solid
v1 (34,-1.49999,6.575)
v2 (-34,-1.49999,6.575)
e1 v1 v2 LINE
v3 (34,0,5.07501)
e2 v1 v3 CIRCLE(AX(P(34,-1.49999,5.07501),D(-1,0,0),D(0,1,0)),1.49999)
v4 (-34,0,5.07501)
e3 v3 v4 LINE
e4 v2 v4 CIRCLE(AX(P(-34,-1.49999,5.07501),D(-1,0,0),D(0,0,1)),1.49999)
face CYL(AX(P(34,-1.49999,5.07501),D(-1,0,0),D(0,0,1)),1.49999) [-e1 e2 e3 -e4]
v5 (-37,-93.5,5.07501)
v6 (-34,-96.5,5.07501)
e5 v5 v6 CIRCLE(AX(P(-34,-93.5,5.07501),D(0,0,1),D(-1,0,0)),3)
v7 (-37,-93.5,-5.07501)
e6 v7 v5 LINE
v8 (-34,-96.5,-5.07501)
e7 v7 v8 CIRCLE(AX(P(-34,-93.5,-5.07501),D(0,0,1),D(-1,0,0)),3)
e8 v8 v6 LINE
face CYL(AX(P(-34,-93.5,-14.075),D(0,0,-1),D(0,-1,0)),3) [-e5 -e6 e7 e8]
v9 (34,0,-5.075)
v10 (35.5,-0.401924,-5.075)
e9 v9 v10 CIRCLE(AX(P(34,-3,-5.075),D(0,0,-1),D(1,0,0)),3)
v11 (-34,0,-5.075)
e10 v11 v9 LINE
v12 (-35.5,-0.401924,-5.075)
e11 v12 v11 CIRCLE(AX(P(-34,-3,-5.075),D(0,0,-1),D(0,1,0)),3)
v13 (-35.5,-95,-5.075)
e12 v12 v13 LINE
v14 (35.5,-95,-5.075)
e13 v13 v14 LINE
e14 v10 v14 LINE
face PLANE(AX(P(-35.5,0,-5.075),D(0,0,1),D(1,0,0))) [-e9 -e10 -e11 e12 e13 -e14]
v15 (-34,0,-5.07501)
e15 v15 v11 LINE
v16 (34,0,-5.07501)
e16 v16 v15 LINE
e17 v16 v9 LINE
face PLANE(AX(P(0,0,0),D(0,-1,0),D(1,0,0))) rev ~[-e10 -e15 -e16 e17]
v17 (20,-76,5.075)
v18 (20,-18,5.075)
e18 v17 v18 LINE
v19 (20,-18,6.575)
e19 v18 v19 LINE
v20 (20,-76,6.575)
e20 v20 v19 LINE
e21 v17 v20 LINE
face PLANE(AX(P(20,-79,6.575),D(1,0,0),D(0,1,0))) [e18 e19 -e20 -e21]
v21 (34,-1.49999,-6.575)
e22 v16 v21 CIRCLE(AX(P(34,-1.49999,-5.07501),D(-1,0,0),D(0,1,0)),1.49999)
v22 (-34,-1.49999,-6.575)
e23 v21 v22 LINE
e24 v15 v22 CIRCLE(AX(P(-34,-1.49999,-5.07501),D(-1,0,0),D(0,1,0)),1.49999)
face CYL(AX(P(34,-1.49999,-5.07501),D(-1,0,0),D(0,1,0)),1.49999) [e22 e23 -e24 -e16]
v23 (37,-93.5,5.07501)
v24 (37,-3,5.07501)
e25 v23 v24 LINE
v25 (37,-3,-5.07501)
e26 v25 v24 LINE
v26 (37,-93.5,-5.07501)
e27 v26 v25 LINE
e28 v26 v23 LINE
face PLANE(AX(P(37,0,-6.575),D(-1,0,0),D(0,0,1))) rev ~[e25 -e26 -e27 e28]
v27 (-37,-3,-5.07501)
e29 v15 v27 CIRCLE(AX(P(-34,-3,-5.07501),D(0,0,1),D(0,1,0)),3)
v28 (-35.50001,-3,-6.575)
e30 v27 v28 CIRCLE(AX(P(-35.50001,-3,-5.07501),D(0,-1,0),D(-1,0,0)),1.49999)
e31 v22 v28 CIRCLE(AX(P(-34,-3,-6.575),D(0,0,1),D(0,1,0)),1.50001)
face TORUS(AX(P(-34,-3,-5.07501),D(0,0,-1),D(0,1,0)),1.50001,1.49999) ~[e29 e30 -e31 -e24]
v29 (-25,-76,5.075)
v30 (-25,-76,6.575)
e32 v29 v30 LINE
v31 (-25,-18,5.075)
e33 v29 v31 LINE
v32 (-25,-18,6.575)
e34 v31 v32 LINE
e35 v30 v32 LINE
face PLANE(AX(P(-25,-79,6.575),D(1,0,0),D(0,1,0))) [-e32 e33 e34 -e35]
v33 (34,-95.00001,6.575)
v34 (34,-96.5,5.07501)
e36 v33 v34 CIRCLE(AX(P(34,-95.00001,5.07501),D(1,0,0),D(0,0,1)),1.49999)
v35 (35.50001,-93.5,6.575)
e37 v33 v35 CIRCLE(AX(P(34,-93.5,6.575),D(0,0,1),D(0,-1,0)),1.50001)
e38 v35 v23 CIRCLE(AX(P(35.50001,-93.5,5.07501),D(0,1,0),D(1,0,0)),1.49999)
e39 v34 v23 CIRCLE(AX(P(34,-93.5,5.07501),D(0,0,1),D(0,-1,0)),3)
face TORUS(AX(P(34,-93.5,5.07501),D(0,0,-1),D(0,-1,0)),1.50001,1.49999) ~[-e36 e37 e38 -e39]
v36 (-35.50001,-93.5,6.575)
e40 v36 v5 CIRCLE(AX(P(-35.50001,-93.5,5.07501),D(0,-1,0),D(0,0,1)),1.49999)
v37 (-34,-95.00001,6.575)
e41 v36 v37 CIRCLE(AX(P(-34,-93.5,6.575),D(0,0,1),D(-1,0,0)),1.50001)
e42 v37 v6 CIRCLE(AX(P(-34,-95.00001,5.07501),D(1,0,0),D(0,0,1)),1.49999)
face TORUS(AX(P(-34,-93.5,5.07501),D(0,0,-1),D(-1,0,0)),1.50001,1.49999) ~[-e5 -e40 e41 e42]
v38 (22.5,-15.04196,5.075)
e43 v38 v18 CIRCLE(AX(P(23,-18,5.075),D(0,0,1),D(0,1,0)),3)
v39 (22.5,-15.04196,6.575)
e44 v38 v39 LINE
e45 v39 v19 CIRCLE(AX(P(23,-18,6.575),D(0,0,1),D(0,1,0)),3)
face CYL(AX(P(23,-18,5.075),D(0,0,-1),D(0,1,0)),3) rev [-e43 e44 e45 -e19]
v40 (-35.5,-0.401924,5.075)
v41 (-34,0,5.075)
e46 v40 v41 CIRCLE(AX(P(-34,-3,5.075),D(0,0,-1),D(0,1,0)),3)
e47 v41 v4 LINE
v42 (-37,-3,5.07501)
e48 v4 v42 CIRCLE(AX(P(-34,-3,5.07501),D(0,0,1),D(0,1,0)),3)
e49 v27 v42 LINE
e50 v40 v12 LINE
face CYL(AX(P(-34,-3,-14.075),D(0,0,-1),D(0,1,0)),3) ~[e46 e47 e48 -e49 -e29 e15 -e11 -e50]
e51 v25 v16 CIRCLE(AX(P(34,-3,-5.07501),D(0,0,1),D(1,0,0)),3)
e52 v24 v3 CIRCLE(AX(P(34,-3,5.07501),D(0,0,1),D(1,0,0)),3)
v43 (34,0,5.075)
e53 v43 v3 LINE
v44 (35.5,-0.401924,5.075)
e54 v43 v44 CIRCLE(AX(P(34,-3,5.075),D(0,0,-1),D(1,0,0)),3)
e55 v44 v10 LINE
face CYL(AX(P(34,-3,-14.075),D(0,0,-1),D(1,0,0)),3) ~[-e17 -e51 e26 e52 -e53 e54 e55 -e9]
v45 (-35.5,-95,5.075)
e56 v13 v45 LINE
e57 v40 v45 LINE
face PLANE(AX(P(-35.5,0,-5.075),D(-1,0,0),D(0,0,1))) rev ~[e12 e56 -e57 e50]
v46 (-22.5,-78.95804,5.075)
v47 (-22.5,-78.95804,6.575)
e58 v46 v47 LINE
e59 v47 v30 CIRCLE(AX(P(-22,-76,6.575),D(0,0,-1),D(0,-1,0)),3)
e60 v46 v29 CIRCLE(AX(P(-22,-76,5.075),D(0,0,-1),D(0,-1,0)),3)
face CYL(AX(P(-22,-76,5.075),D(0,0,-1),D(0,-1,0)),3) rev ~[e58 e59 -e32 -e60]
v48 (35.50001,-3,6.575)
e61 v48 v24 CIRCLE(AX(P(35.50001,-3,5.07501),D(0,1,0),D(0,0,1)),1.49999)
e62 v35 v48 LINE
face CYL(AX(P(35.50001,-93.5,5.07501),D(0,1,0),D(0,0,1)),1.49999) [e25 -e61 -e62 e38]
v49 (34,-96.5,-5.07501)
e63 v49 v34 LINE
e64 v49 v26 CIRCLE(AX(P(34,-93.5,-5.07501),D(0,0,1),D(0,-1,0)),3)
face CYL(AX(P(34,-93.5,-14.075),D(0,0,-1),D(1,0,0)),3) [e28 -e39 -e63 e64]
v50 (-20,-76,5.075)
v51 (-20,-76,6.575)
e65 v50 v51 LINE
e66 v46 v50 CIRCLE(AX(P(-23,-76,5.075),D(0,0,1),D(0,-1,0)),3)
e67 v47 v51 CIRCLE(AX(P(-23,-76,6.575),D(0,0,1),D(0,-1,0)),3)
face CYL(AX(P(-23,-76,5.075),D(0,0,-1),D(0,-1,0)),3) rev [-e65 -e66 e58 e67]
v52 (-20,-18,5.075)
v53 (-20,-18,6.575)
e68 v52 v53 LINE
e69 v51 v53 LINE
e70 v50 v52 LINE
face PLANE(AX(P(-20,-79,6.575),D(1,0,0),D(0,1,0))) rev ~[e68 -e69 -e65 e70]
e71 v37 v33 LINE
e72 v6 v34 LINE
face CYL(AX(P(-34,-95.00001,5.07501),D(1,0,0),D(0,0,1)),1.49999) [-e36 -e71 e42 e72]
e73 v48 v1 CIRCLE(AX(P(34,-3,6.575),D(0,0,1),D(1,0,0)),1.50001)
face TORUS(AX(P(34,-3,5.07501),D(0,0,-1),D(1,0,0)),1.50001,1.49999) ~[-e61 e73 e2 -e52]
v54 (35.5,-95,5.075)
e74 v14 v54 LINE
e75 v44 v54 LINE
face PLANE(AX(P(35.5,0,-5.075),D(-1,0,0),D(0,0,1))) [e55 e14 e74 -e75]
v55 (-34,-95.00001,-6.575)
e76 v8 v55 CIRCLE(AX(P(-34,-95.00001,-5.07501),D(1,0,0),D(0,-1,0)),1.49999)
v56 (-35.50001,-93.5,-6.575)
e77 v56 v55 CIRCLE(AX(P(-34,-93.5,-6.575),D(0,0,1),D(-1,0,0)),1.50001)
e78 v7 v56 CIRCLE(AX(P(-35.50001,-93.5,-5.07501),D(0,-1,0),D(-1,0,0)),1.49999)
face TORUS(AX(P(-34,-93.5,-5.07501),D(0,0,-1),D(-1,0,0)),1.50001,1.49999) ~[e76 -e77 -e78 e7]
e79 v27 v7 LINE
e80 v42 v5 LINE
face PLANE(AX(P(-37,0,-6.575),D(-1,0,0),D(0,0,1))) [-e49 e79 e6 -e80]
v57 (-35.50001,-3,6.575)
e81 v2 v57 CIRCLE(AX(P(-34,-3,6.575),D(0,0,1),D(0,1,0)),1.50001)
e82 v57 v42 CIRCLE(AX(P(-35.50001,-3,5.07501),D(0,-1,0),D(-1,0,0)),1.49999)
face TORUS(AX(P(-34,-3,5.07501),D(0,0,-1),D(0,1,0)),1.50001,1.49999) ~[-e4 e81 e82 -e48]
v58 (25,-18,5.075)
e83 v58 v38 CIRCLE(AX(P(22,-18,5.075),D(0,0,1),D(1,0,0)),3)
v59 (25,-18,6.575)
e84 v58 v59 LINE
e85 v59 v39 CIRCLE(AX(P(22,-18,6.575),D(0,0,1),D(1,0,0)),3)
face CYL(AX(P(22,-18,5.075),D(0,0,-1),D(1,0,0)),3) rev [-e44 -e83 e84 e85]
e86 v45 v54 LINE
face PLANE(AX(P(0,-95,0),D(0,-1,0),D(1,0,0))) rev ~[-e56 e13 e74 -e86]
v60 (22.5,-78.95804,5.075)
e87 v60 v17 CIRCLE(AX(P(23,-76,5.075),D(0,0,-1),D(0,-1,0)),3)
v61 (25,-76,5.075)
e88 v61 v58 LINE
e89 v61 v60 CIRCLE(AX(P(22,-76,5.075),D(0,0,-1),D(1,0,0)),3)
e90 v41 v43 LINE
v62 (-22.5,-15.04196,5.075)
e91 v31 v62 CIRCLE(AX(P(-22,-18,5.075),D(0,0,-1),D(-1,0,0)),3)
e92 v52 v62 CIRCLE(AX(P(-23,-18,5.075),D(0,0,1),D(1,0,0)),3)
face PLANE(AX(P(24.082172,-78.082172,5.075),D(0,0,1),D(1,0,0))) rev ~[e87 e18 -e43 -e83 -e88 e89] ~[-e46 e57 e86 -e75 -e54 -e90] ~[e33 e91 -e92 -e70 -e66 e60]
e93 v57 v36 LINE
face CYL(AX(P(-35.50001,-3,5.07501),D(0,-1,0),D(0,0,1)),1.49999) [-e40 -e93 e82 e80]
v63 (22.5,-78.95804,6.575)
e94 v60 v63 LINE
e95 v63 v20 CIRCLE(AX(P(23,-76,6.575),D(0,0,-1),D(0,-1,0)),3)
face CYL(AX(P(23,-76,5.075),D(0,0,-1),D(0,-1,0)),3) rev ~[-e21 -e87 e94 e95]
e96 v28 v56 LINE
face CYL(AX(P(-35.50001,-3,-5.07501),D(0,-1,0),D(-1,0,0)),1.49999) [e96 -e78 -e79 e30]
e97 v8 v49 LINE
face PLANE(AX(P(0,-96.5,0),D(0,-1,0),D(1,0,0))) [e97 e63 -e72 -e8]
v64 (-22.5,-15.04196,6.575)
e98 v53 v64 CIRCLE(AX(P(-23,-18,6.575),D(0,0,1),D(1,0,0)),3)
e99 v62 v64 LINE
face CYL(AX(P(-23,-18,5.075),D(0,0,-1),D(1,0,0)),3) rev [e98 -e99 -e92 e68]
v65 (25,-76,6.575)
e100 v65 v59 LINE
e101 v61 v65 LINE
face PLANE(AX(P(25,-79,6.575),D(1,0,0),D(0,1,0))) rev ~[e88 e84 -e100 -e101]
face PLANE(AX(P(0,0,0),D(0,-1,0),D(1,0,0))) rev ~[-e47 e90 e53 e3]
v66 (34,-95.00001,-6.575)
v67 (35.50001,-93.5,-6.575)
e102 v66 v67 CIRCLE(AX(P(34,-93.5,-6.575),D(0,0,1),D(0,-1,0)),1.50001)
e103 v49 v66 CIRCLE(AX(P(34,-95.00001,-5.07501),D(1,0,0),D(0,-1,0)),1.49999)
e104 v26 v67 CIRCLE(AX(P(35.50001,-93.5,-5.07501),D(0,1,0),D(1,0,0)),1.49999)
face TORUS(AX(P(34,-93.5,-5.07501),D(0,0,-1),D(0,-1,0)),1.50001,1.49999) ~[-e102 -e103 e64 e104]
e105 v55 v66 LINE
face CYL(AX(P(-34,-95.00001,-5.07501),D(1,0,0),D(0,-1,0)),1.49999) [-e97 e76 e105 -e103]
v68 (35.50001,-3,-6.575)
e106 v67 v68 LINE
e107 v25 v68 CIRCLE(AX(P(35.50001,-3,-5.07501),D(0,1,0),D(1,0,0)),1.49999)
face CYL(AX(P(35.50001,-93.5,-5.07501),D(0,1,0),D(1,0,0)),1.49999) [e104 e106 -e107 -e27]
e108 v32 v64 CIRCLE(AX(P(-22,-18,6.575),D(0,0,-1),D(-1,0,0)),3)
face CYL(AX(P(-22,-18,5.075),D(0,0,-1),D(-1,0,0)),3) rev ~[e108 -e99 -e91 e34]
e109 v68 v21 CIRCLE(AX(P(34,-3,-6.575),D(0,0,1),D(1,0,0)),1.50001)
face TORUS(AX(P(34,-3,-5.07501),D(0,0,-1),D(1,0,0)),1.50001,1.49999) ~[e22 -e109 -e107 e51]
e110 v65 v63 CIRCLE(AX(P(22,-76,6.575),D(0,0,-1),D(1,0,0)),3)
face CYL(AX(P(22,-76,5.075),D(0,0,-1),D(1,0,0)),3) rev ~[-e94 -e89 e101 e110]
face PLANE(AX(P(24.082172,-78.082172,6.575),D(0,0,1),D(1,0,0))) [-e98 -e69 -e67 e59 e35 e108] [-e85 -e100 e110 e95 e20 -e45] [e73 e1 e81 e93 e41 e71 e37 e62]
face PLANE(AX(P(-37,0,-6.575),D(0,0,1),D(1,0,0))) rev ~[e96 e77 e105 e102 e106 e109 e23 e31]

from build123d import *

# Parameters (mm, degrees)
F0_W        = 74
F0_H        = 13.15
F0_W_2      = 71
F0_H_2      = 10.15
F1_DEPTH    = 96.5
F2_DEPTH    = 95
F3_W        = 5
F3_H        = 64
F4_DEPTH    = 3
F5_T1_DEPTH = 28.15
F6_T1_DEPTH = 1.5
F7_R        = 1.49999


# Not quite as in the source:
# - a fillet or chamfer that OpenCascade refuses, or shapes differently, is made with other operations: its cross-section is extruded or revolved along the edge and cut away or added
# - a fillet or chamfer is up to 0.001 mm smaller than in the source, because OpenCascade refuses the exact size


with BuildPart() as f1:
    # F0 (on Front) → F1 (new body)
    with BuildSketch(Plane.XZ):
        Rectangle(F0_W, F0_H)
        Rectangle(F0_W_2, F0_H_2, mode=Mode.SUBTRACT)
        Rectangle(F0_W_2, F0_H_2)
    extrude(amount=F1_DEPTH)

    # F0 (on Front) → F2 (cut)
    with BuildSketch(Plane.XZ):
        Rectangle(F0_W_2, F0_H_2)
    extrude(amount=F2_DEPTH, mode=Mode.SUBTRACT)

    # F3 (on face) → F4 (cut)
    with BuildSketch(Plane.XY.offset(6.575)):
        with Locations((22.5, -47)):
            Rectangle(F3_W, F3_H)
        with Locations((-22.5, -47)):
            Rectangle(F3_W, F3_H)
    extrude(amount=-F4_DEPTH, mode=Mode.SUBTRACT)

    # F5: fillet of radius 3 on 4 edges, made by hand

    # F5_s2 → F5_t1 (cut)
    with BuildSketch(Plane.XY.offset(-14.075)):
        with BuildLine():
            ThreePointArc((37, -93.5), (36.1213203436, -95.6213203436), (34, -96.5))
            Line((34, -96.5), (37, -96.5))
            Line((37, -96.5), (37, -93.5))
        make_face()
        with BuildLine():
            ThreePointArc((-34, 0), (-36.1213203436, -0.8786796564), (-37, -3))
            Line((-37, -3), (-37, 0))
            Line((-37, 0), (-34, 0))
        make_face()
        with BuildLine():
            ThreePointArc((37, -3), (36.1213203436, -0.8786796564), (34, 0))
            Line((34, 0), (37, 0))
            Line((37, 0), (37, -3))
        make_face()
        with BuildLine():
            ThreePointArc((-34, -96.5), (-36.1213203436, -95.6213203436), (-37, -93.5))
            Line((-37, -93.5), (-37, -96.5))
            Line((-37, -96.5), (-34, -96.5))
        make_face()
    extrude(amount=F5_T1_DEPTH, mode=Mode.SUBTRACT)

    # F6: fillet of radius 3 on 8 edges, made by hand

    # F6_s2 → F6_t1 (join)
    with BuildSketch(Plane.XY.offset(5.075)):
        with BuildLine():
            ThreePointArc((25, -76), (24.1213203436, -78.1213203436), (22, -79))
            Line((22, -79), (25, -79))
            Line((25, -79), (25, -76))
        make_face()
        with BuildLine():
            ThreePointArc((23, -15), (20.8786796564, -15.8786796564), (20, -18))
            Line((20, -18), (20, -15))
            Line((20, -15), (23, -15))
        make_face()
        with BuildLine():
            ThreePointArc((25, -18), (24.1213203436, -15.8786796564), (22, -15))
            Line((22, -15), (25, -15))
            Line((25, -15), (25, -18))
        make_face()
        with BuildLine():
            ThreePointArc((23, -79), (20.8786796564, -78.1213203436), (20, -76))
            Line((20, -76), (20, -79))
            Line((20, -79), (23, -79))
        make_face()
        with BuildLine():
            ThreePointArc((-23, -79), (-20.8786796564, -78.1213203436), (-20, -76))
            Line((-20, -76), (-20, -79))
            Line((-20, -79), (-23, -79))
        make_face()
        with BuildLine():
            ThreePointArc((-25, -18), (-24.1213203436, -15.8786796564), (-22, -15))
            Line((-22, -15), (-25, -15))
            Line((-25, -15), (-25, -18))
        make_face()
        with BuildLine():
            ThreePointArc((-22, -79), (-24.1213203436, -78.1213203436), (-25, -76))
            Line((-25, -76), (-25, -79))
            Line((-25, -79), (-22, -79))
        make_face()
        with BuildLine():
            ThreePointArc((-20, -18), (-20.8786796564, -15.8786796564), (-23, -15))
            Line((-23, -15), (-20, -15))
            Line((-20, -15), (-20, -18))
        make_face()
    extrude(amount=F6_T1_DEPTH)

    # F7 (radius 1.5 in the source; OpenCascade refuses exactly that, so slightly less here)
    f7_edges = [f1.edges().sort_by_distance(p)[0] for p in [
        (0, -96.5, 6.575),
        (37, -48.25, 6.575),
        (-37, -48.25, 6.575),
        (0, -96.5, -6.575),
        (37, -48.25, -6.575),
        (-37, -48.25, -6.575),
    ]]
    fillet(f7_edges, radius=F7_R)


solid = f1.part
